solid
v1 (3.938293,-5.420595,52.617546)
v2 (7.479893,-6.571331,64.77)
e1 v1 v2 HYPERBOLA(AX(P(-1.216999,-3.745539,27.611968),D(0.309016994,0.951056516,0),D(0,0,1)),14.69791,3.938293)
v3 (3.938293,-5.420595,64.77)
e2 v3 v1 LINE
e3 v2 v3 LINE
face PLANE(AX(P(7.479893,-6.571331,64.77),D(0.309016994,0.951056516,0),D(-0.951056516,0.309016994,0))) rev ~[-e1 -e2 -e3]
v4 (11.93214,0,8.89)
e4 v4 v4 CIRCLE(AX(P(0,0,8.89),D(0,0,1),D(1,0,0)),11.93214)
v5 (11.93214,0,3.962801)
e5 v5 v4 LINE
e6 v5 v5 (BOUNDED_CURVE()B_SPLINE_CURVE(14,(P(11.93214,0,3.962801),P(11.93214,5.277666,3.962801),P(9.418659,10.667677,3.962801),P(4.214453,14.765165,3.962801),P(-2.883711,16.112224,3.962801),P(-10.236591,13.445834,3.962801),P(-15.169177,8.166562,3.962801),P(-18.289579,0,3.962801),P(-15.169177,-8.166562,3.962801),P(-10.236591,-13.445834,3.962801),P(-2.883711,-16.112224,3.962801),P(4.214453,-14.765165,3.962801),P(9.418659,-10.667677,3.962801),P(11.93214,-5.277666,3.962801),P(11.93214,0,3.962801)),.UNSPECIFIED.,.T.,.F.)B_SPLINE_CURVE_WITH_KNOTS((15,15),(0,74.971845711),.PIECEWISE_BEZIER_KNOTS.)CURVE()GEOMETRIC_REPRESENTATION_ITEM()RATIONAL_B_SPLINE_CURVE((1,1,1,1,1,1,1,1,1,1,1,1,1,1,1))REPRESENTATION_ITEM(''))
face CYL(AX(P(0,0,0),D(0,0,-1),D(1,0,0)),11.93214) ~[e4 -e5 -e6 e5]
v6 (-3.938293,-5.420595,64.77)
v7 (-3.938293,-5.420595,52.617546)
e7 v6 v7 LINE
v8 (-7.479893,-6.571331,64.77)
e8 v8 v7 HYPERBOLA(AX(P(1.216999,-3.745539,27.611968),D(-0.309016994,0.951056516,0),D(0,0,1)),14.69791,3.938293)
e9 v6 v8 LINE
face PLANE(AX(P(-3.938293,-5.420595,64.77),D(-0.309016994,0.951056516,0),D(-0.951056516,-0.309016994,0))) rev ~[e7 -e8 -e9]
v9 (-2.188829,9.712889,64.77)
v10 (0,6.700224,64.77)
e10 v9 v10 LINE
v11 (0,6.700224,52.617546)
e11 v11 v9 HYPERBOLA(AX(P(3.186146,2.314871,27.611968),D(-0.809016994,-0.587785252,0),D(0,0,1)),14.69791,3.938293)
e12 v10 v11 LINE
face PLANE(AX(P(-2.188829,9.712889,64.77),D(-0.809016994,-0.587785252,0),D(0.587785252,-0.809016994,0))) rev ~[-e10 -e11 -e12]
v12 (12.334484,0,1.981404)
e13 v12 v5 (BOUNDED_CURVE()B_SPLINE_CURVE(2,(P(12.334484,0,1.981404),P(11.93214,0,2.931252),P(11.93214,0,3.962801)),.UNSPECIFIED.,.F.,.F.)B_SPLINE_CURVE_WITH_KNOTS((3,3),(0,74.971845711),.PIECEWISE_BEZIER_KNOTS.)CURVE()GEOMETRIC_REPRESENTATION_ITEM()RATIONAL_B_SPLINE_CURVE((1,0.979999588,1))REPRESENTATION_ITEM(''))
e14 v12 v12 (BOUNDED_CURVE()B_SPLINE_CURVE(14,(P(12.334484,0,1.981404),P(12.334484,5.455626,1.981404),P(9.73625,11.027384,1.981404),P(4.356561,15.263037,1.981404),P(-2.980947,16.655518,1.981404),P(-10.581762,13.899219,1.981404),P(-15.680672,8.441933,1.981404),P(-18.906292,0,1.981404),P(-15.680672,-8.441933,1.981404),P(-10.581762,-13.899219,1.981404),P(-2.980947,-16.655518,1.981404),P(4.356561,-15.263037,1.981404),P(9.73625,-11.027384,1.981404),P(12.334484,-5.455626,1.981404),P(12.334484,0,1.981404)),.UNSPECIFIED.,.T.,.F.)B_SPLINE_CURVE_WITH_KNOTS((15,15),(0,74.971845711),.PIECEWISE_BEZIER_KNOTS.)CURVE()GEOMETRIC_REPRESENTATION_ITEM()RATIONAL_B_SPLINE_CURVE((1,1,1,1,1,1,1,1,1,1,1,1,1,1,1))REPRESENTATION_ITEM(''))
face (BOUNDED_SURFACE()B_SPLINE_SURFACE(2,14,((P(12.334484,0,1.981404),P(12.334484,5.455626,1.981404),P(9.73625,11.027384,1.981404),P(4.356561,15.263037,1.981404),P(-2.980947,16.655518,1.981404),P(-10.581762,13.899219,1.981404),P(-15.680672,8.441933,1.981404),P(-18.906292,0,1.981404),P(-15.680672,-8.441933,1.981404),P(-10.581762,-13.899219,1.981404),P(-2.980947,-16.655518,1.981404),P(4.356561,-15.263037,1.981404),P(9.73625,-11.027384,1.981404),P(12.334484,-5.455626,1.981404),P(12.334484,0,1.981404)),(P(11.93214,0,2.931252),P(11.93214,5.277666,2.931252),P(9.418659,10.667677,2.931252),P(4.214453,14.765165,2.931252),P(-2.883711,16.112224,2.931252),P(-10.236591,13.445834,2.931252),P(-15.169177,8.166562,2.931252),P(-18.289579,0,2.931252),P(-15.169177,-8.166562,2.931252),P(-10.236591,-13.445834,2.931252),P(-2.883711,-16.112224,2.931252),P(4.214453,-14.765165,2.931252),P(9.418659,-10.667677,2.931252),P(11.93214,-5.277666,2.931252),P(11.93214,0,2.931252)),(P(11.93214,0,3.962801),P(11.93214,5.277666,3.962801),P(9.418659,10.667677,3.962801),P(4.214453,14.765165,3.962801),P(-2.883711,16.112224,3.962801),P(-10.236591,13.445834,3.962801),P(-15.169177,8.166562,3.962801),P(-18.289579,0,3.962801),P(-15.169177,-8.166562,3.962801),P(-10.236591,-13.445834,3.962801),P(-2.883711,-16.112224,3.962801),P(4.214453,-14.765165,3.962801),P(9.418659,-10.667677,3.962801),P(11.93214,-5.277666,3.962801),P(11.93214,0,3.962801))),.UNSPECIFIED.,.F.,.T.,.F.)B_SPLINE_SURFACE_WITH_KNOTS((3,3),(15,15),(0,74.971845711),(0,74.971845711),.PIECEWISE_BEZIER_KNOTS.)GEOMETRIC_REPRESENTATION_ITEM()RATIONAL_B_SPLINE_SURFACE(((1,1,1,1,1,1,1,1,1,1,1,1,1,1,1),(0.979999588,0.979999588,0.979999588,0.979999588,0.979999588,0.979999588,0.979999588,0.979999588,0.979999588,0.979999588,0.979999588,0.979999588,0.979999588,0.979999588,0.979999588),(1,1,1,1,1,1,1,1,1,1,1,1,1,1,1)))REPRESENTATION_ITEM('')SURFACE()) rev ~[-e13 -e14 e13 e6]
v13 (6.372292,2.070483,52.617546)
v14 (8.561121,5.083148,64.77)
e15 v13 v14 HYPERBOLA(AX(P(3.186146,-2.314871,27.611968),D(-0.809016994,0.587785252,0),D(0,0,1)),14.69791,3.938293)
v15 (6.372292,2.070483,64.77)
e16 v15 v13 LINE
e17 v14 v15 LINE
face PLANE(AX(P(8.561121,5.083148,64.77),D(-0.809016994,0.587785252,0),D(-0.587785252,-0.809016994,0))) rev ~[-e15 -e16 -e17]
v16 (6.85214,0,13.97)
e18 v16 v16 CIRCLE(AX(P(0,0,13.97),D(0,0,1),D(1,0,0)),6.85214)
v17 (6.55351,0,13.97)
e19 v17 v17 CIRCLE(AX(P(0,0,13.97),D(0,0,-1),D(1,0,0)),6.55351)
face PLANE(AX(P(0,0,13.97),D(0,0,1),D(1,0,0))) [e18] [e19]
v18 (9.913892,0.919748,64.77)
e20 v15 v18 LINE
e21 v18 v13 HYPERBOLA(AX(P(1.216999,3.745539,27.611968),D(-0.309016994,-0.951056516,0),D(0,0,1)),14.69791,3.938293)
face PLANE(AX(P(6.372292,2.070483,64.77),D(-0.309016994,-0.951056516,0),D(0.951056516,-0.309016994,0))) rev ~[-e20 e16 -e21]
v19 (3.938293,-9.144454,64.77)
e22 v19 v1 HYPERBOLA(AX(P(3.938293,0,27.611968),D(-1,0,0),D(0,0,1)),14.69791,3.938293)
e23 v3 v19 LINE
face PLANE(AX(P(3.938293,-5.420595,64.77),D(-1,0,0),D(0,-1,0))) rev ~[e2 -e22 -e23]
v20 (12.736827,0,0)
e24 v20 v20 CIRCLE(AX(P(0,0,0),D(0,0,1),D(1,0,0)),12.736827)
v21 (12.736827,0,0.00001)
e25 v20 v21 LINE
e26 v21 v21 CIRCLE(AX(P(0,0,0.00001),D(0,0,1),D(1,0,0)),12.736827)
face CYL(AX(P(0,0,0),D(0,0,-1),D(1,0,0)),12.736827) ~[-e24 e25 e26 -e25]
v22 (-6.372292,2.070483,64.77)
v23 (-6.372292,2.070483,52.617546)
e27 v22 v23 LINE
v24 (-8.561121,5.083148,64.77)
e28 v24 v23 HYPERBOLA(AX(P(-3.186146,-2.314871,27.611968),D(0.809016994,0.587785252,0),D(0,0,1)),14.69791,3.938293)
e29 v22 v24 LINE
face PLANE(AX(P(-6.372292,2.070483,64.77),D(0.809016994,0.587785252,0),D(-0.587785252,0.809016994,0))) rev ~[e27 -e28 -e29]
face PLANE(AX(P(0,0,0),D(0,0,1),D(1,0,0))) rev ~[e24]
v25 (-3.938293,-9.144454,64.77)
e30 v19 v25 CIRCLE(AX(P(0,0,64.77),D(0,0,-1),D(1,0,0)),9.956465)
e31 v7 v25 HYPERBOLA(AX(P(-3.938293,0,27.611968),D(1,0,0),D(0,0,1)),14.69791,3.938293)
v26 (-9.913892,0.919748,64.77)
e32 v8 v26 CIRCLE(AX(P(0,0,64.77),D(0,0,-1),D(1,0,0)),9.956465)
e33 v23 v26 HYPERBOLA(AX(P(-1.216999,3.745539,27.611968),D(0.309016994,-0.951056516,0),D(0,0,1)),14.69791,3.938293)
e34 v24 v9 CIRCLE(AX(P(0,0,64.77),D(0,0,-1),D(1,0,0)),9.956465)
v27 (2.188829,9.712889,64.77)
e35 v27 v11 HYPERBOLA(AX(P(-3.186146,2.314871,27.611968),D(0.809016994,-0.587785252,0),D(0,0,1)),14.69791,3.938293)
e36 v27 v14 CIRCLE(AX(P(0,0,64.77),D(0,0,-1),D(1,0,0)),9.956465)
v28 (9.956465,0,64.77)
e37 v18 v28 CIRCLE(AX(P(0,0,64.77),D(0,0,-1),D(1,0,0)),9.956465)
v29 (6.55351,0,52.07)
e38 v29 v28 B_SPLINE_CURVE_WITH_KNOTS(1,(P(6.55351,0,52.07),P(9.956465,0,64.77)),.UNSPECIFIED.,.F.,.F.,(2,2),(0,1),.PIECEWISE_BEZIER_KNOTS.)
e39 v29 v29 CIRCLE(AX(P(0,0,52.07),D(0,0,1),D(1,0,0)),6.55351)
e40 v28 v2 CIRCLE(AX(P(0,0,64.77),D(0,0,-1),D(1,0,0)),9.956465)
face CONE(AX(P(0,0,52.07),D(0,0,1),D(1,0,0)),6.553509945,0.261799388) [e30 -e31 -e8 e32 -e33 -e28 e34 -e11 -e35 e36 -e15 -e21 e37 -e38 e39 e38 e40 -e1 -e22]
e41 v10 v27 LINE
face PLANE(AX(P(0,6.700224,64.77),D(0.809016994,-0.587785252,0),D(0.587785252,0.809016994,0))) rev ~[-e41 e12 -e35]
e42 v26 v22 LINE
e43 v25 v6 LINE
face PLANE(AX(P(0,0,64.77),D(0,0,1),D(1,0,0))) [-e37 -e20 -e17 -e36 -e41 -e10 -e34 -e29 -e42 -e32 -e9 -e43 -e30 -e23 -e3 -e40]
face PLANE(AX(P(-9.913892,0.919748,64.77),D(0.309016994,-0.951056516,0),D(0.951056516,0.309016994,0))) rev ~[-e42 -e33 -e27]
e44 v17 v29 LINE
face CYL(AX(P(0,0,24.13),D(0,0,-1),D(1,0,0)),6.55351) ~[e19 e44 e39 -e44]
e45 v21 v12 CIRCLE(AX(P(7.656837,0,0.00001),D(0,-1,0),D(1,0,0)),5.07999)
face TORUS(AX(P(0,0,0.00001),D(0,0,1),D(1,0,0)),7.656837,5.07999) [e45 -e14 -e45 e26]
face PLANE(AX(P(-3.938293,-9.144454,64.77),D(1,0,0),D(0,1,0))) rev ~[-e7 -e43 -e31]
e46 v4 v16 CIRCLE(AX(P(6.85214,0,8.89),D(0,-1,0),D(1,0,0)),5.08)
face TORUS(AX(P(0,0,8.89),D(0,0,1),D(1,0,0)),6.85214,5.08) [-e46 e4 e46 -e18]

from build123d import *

# Parameters (mm, degrees)
F0_R      = 12.7368274584
F1_DEPTH  = 5.08
F2_R      = 5.07999
F3_R      = 11.9321398377
F4_DEPTH  = 13.97
F5_R      = 5.08
F6_R      = 6.5535099449
F7_DEPTH  = 24.13
F8_DEPTH  = 27.94
F8_FACE_R = 6.5535099449
F9_DEPTH  = 12.7
F9_TAPER  = -15
F11_DEPTH = 25.4


# Not quite as in the source:
# - a fillet or chamfer is up to 0.001 mm smaller than in the source, because OpenCascade refuses the exact size


with BuildPart() as f1:
    # F0 (on Top) → F1 (new body)
    with BuildSketch(Plane.XY):
        Circle(F0_R)
    extrude(amount=F1_DEPTH)

    # F2 (radius 5.08 in the source; OpenCascade refuses exactly that, so slightly less here)
    f2_edges = [f1.edges().sort_by_distance(p)[0] for p in [
        (-12.736827, 0, 5.08),
    ]]
    fillet(f2_edges, radius=F2_R)

    # F3 (on Top) → F4 (join)
    with BuildSketch(Plane.XY):
        Circle(F3_R)
    extrude(amount=F4_DEPTH)

    # F5
    f5_edges = [f1.edges().sort_by_distance(p)[0] for p in [
        (-11.93214, 0, 2.743746),
        (11.93214, 0, 8.356873),
        (-11.93214, 0, 13.97),
    ]]
    fillet(f5_edges, radius=F5_R)

    # F6 (on Top) → F7 (join)
    with BuildSketch(Plane.XY):
        Circle(F6_R)
    extrude(amount=F7_DEPTH)

    # F8 (add): a face of the model
    f8_faces = [f1.faces().sort_by_distance(p)[0] for p in [
        (0, 0, 24.13),
    ]]
    extrude(f8_faces, amount=F8_DEPTH)

    # F8_face (on face) → F9 (join)
    with BuildSketch(Plane.XY.offset(52.07)):
        Circle(F8_FACE_R)
    extrude(amount=F9_DEPTH, taper=F9_TAPER)

    # F10 (on face) → F11 (cut)
    with BuildSketch(Plane.XY.offset(64.77)):
        with BuildLine():
            Line((3.9382930845, -5.420595399), (3.9382930845, -9.1444538754))
            ThreePointArc((3.9382930845, -9.1444538754), (5.852263109, -8.0549491371), (7.4798929542, -6.5713309529))
            Line((7.4798929542, -6.5713309529), (3.9382930845, -5.420595399))
        make_face()
        with BuildLine():
            Line((8.5611211624, 5.0831479952), (6.3722920684, 2.0704832032))
            Line((6.3722920684, 2.0704832032), (9.9138919381, 0.9197476493))
            ThreePointArc((9.9138919381, 0.9197476493), (9.4691606215, 3.0767167927), (8.5611211624, 5.0831479952))
        make_face()
        with BuildLine():
            Line((-2.188829094, 9.7128891837), (0, 6.7002243917))
            Line((0, 6.7002243917), (2.188829094, 9.7128891837))
            ThreePointArc((2.188829094, 9.7128891837), (0, 9.9564646887), (-2.188829094, 9.7128891837))
        make_face()
        with BuildLine():
            ThreePointArc((-8.5611211624, 5.0831479952), (-9.4691606215, 3.0767167927), (-9.9138919381, 0.9197476493))
            Line((-9.9138919381, 0.9197476493), (-6.3722920684, 2.0704832032))
            Line((-6.3722920684, 2.0704832032), (-8.5611211624, 5.0831479952))
        make_face()
        with BuildLine():
            ThreePointArc((-7.4798929542, -6.5713309529), (-5.852263109, -8.0549491371), (-3.9382930845, -9.1444538754))
            Line((-3.9382930845, -9.1444538754), (-3.9382930845, -5.420595399))
            Line((-3.9382930845, -5.420595399), (-7.4798929542, -6.5713309529))
        make_face()
    extrude(amount=-F11_DEPTH, mode=Mode.SUBTRACT)


solid = f1.part
